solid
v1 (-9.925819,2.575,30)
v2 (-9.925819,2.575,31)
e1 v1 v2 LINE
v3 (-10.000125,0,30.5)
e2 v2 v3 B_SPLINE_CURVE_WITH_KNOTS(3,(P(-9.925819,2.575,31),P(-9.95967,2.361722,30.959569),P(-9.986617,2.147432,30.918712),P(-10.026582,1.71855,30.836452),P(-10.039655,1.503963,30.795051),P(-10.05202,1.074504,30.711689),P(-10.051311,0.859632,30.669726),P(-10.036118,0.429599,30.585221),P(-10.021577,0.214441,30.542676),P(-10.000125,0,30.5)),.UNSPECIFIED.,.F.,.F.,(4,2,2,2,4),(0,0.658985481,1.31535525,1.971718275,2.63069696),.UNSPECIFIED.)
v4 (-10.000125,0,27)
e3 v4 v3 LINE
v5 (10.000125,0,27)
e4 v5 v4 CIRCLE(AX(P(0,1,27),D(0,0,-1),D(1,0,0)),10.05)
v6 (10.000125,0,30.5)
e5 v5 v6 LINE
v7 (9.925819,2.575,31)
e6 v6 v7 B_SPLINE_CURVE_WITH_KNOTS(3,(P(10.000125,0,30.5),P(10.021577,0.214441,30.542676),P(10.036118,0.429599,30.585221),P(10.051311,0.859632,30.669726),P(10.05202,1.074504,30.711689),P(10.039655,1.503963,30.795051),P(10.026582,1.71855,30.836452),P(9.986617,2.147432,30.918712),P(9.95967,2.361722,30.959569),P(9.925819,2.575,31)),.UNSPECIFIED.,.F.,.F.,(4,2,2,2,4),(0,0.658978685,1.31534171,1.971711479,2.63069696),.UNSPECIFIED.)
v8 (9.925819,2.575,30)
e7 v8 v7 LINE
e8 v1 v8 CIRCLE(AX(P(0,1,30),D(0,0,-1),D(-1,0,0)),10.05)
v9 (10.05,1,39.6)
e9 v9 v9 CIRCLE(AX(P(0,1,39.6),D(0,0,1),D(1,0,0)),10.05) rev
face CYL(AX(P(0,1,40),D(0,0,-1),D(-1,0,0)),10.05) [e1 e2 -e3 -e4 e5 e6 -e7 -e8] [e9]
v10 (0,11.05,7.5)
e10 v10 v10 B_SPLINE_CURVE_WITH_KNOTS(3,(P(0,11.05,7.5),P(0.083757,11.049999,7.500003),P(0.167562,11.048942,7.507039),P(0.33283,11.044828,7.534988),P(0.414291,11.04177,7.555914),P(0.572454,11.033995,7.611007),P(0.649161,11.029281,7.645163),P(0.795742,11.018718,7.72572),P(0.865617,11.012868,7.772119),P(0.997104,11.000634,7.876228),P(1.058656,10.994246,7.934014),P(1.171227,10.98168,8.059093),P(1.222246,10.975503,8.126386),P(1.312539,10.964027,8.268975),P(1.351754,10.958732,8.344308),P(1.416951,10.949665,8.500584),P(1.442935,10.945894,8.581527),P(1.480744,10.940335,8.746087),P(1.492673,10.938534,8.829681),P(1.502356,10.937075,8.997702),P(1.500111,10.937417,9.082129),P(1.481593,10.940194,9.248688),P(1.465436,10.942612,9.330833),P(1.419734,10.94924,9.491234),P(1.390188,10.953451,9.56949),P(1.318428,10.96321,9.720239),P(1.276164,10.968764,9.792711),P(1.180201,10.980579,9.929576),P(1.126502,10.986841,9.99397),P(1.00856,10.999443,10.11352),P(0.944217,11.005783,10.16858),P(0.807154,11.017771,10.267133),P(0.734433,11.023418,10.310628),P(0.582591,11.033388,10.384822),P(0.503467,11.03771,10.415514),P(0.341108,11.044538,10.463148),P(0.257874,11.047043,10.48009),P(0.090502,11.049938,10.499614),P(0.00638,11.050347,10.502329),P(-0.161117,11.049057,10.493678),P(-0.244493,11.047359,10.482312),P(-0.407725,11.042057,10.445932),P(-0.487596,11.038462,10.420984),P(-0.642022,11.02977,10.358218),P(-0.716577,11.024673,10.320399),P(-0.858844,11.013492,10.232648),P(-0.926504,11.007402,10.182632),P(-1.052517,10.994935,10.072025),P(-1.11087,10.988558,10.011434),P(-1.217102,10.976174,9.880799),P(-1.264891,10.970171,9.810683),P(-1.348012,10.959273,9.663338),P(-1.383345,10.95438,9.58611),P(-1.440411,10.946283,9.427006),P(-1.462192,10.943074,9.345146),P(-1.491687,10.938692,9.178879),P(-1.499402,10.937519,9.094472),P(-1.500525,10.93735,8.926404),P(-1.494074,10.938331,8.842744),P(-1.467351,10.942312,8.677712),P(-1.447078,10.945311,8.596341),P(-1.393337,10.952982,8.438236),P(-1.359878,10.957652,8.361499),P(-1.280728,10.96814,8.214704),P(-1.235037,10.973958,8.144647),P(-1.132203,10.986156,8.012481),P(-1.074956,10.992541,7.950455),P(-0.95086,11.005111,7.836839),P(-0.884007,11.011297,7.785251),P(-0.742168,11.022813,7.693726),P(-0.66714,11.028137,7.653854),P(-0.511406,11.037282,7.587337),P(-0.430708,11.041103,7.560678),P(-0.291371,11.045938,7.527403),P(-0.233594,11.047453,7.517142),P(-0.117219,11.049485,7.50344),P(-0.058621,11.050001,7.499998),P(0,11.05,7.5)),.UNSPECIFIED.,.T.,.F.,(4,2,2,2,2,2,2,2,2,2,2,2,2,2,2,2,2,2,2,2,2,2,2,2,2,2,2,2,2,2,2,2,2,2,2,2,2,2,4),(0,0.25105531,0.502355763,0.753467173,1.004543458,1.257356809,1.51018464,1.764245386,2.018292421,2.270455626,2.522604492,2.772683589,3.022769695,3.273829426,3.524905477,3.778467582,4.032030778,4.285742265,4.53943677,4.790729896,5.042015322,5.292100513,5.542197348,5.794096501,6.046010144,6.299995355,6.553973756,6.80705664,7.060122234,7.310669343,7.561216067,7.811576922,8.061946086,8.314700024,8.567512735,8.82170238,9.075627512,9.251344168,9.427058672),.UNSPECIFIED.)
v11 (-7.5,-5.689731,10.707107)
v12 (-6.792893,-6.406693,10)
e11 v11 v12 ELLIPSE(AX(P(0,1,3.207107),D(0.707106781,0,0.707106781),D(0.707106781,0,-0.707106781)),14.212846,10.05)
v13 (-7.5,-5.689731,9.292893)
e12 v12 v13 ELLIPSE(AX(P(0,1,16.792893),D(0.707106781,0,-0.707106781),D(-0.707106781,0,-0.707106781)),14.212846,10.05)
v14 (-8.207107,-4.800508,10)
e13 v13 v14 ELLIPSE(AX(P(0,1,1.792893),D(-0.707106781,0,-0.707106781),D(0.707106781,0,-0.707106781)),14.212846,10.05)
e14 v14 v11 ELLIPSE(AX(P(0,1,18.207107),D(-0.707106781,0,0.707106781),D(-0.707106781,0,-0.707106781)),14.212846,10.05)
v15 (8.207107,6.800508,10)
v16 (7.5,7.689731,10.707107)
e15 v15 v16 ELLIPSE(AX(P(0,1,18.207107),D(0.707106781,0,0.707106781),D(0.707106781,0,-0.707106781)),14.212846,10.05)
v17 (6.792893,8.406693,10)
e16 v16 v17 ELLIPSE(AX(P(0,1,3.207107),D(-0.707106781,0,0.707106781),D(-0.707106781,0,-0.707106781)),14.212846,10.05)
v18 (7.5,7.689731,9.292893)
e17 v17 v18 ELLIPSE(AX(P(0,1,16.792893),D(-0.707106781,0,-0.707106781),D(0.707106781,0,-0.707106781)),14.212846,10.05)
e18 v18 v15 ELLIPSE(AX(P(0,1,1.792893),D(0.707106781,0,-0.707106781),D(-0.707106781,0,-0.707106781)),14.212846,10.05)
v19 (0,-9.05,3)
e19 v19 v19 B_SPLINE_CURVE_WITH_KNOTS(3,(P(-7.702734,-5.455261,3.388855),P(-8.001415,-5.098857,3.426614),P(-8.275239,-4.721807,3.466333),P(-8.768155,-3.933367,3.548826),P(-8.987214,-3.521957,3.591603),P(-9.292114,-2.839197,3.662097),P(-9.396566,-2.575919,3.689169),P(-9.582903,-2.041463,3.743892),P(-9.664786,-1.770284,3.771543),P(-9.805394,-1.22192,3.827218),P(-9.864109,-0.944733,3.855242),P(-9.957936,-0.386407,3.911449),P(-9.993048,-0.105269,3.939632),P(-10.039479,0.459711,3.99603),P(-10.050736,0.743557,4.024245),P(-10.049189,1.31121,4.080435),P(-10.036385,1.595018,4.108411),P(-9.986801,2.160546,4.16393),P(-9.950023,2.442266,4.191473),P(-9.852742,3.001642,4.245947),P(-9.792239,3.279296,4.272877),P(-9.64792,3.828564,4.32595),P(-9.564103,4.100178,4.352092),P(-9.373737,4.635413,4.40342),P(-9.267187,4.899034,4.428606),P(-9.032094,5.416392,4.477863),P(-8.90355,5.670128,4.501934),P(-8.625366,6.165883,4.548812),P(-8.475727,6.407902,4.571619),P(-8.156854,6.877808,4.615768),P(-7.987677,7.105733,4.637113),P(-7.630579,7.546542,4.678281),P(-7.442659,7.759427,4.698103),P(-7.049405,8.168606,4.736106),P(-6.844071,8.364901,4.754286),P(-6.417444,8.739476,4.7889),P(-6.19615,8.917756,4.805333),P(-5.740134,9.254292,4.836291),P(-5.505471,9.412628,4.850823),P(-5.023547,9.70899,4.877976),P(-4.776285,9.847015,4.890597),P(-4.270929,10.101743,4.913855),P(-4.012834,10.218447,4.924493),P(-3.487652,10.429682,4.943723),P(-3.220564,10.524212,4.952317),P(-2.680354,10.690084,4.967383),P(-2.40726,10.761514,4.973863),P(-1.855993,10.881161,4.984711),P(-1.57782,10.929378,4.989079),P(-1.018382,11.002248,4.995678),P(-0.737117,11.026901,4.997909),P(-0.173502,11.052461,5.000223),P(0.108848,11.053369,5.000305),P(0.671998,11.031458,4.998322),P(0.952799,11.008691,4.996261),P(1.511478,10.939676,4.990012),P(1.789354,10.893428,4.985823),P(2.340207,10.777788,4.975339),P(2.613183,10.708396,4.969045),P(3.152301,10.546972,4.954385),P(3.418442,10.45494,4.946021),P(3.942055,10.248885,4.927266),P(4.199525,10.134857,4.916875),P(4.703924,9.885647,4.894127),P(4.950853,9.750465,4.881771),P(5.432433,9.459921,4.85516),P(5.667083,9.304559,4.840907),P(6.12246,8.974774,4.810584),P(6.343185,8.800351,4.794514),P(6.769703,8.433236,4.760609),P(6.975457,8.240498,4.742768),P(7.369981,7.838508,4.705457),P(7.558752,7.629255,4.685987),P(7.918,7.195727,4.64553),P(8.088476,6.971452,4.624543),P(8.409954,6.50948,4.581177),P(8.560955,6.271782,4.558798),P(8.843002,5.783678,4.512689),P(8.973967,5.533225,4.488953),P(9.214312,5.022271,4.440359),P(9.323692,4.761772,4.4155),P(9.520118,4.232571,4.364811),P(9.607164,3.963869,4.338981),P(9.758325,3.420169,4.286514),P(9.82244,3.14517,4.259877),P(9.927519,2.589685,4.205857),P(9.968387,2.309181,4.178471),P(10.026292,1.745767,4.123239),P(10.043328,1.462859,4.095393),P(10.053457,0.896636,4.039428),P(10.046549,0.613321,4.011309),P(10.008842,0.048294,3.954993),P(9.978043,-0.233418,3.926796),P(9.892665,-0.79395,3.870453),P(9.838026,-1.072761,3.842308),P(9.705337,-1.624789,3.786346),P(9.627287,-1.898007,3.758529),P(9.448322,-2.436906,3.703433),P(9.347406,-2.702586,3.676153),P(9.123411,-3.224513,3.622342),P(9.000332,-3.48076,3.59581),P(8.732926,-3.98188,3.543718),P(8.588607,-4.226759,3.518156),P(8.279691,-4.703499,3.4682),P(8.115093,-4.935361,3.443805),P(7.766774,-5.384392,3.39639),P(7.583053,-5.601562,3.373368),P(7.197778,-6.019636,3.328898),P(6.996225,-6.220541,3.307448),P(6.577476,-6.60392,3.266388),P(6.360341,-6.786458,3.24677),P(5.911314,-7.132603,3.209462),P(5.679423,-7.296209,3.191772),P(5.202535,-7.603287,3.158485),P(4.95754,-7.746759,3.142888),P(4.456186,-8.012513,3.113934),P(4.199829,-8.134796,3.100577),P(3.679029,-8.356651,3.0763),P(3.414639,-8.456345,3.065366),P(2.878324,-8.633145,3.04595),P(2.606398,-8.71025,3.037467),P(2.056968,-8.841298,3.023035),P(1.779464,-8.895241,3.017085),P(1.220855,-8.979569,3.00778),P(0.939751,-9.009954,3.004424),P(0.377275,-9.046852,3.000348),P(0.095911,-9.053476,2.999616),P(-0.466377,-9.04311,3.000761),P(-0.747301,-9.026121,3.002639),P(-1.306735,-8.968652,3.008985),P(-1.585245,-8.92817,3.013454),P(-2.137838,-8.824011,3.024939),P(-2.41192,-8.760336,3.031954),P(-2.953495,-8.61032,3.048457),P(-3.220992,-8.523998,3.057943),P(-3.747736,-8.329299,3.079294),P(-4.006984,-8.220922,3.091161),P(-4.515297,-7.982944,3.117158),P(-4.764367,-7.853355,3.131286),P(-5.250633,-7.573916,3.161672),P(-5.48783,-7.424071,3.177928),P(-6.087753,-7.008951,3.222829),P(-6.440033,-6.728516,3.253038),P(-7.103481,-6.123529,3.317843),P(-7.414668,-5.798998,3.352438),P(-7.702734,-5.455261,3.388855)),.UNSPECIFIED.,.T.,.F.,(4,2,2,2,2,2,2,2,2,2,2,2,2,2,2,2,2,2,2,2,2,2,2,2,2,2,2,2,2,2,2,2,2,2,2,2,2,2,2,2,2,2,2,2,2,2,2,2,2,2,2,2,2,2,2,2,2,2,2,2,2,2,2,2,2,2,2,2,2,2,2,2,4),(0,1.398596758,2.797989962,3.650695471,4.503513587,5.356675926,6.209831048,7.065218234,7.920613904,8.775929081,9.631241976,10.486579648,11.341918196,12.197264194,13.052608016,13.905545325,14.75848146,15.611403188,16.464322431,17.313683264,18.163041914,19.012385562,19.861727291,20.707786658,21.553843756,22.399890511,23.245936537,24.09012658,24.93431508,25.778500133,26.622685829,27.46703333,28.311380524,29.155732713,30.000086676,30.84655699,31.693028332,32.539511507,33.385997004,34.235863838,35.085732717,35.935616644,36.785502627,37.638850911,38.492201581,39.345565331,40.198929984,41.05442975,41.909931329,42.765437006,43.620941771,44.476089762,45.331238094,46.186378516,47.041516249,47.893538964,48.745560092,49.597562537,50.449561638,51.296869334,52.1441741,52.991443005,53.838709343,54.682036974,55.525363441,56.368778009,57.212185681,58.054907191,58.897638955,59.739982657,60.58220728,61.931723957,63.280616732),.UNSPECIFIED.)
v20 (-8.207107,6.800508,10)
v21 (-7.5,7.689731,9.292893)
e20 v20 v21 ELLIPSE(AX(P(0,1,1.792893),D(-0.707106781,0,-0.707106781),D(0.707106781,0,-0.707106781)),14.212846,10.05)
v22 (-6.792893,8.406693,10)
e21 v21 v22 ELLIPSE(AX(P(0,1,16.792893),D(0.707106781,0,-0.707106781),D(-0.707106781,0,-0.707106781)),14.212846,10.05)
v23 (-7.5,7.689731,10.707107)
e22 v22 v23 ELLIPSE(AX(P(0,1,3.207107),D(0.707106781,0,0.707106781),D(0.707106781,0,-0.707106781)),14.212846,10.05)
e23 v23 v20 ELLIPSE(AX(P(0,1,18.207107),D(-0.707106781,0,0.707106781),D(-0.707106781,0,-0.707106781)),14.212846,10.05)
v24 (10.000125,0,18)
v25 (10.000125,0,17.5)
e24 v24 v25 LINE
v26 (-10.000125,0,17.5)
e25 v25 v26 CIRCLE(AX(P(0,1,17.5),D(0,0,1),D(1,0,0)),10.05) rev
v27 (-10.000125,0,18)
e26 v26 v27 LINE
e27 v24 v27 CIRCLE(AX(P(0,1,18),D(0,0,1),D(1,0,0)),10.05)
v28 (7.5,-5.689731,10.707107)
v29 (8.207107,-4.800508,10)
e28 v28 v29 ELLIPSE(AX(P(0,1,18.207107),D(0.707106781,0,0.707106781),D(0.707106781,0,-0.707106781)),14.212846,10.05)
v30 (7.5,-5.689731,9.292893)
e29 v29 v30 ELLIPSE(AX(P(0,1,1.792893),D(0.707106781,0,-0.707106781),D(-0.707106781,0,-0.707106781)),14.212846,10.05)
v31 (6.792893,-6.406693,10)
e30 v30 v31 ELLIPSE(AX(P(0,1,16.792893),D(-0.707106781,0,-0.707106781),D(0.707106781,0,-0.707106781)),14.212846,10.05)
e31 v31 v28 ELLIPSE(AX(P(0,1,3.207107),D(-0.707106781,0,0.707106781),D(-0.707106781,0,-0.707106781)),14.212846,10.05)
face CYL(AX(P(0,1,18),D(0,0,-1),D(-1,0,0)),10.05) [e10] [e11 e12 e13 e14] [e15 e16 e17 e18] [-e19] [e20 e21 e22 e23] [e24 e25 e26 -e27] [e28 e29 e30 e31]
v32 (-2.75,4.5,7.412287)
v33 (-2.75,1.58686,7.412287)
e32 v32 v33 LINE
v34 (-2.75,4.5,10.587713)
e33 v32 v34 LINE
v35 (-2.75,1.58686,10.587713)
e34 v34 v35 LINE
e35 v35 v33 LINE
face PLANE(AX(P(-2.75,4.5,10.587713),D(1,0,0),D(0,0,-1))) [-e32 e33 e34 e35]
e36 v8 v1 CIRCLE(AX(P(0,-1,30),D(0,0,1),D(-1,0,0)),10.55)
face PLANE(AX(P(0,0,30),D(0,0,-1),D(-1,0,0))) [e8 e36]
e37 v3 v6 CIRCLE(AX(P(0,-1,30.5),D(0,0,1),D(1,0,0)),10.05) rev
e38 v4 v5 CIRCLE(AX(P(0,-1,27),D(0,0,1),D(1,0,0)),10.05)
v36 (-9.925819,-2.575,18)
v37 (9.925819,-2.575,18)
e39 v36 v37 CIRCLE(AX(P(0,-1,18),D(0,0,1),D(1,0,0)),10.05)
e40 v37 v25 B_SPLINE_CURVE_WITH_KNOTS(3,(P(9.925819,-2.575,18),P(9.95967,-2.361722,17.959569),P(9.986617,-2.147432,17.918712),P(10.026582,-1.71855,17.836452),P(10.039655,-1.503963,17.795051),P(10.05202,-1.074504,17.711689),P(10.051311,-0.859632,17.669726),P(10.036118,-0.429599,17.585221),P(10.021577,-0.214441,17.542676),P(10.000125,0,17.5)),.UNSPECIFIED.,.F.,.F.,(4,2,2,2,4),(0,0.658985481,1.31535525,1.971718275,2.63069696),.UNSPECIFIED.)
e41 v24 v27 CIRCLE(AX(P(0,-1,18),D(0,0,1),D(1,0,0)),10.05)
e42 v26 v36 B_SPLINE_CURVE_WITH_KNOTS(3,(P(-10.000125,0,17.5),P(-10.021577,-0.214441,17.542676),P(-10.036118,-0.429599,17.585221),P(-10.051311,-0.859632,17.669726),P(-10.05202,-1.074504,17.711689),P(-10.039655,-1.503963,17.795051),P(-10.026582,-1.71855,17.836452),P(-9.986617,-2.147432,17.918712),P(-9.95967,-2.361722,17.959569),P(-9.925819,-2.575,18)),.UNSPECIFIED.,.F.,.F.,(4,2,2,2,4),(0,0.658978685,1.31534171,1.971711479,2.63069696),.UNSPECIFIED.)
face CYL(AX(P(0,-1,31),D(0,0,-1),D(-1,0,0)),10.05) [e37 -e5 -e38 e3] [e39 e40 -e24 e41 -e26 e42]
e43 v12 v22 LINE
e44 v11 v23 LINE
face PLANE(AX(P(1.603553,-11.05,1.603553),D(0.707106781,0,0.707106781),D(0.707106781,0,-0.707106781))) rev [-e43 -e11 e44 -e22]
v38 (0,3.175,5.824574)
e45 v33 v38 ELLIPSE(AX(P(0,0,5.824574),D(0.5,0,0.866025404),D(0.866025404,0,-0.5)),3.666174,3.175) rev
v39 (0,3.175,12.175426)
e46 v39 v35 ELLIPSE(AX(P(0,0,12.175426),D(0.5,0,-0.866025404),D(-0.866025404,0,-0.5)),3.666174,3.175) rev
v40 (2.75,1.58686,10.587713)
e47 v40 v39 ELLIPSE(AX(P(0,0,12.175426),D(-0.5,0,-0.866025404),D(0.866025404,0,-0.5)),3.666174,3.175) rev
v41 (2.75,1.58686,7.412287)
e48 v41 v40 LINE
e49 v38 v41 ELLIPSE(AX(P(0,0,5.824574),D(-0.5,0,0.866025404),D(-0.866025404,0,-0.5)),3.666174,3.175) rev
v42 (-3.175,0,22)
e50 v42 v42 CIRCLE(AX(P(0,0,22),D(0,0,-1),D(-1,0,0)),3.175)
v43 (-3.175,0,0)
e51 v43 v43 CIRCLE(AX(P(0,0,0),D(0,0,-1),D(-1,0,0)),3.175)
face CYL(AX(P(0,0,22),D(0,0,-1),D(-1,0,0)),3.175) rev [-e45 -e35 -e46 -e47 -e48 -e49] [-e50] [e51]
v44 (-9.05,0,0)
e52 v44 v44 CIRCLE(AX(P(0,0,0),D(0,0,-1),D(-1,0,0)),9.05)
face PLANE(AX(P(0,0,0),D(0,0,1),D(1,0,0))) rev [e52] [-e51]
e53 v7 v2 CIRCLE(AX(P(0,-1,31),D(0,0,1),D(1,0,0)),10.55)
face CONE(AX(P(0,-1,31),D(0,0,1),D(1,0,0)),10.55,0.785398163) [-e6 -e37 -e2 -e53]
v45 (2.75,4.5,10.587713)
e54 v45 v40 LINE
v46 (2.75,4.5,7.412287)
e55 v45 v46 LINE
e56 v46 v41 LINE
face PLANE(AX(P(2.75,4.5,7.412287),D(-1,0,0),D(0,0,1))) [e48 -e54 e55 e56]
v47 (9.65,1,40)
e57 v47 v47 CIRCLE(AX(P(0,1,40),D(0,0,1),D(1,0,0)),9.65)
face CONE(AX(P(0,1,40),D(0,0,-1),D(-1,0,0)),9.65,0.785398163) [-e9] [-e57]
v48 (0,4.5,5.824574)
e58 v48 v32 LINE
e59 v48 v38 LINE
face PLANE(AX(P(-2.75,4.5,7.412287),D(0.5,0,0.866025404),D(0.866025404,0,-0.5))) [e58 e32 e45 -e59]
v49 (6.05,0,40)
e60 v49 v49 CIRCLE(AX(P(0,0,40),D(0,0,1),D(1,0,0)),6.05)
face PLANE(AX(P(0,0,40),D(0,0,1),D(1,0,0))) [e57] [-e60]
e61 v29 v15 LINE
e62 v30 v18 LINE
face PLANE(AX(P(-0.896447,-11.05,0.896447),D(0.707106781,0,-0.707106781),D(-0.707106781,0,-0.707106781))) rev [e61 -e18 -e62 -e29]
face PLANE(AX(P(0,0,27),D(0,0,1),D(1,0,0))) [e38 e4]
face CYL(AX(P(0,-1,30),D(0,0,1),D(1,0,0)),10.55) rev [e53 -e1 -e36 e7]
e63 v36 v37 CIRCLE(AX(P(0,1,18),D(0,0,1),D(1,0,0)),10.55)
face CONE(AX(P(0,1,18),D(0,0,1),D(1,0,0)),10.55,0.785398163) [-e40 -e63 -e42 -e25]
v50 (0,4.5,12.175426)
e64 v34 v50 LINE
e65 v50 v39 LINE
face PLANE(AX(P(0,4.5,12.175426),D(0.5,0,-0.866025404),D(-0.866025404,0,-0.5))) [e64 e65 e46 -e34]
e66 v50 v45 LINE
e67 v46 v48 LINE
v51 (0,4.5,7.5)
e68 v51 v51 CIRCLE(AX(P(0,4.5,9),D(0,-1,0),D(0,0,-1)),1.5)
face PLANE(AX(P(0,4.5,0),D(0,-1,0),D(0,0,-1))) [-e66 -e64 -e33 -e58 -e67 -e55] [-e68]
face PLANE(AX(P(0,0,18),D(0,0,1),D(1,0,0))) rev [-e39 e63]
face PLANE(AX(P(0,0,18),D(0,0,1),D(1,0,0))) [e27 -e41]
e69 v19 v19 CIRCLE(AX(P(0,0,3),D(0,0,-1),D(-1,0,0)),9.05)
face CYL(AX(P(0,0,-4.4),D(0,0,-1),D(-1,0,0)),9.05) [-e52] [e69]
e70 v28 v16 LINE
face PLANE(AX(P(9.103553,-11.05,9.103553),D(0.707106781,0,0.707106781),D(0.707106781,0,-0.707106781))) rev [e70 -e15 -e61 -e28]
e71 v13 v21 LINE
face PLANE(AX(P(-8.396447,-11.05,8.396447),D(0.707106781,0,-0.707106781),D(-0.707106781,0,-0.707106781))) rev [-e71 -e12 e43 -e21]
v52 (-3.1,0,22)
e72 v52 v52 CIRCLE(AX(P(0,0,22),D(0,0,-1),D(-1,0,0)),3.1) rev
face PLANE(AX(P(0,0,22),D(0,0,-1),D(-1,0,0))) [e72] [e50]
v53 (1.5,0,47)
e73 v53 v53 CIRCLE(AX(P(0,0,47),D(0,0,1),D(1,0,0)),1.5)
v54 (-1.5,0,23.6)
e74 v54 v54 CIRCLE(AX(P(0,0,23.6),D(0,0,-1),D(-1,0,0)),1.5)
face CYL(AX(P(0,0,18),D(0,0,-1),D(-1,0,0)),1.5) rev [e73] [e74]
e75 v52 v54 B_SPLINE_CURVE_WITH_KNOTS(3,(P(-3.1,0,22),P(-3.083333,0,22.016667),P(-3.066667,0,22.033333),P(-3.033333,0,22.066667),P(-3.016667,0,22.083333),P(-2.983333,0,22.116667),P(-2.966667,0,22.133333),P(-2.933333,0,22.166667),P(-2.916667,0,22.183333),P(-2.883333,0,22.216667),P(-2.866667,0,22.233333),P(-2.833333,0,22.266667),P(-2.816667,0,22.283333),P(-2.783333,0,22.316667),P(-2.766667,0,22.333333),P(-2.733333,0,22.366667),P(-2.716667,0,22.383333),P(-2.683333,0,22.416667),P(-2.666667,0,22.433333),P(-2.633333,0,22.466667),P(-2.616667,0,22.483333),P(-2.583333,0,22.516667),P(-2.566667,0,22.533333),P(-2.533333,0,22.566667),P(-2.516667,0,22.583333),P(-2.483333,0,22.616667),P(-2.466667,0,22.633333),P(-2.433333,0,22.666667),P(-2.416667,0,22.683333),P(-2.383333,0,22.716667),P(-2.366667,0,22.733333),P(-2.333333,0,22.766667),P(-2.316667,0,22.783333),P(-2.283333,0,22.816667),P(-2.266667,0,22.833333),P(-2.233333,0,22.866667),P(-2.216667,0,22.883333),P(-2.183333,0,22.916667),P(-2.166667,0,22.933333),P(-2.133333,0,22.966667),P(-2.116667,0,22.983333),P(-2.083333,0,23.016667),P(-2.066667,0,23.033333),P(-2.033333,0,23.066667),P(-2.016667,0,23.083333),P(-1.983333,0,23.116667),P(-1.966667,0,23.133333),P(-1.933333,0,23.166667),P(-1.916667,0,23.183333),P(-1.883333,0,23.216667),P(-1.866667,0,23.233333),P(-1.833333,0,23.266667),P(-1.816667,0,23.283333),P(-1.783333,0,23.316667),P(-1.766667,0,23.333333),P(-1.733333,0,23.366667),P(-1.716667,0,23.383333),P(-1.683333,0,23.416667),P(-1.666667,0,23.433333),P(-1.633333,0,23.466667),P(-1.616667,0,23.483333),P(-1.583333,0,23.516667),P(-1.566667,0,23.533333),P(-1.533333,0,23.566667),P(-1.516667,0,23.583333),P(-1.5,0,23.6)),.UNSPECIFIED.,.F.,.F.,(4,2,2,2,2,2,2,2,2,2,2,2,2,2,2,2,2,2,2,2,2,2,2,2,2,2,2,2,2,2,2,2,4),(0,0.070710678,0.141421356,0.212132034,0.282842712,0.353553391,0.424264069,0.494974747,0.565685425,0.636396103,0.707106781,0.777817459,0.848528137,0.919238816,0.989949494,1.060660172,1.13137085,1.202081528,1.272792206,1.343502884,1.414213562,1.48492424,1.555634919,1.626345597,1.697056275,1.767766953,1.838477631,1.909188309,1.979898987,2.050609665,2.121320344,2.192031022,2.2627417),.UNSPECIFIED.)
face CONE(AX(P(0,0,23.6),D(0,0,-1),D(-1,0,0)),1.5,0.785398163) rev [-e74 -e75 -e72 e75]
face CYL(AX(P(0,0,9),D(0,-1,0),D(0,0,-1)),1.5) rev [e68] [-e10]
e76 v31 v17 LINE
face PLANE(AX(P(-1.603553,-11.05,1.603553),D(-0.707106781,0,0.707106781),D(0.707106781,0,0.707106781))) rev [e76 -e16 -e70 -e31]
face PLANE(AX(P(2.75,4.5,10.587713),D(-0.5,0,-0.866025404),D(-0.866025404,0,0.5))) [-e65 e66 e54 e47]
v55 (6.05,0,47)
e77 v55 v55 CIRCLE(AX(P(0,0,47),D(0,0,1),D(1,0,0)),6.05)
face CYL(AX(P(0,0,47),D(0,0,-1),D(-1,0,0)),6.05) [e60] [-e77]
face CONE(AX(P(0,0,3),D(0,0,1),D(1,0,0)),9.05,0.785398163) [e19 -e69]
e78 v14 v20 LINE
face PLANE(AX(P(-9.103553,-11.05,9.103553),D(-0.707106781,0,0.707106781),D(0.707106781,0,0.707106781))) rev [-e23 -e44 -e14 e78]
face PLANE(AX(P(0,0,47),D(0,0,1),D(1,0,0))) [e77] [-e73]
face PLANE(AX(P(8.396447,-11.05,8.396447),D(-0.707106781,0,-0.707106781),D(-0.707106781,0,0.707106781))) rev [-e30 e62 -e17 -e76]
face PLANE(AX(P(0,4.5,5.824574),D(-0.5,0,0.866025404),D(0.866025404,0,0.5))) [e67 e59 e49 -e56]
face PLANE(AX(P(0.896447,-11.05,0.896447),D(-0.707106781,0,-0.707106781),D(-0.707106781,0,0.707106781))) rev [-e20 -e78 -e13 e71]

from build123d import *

# Parameters (mm, degrees)
SKETCH1_R             = 10.05
SKETCH1_R_2           = 1.5
EXTRUSION1_DEPTH      = 18
SKETCH2_R             = 10.05
SKETCH2_R_2           = 1.5
EXTRUSION2_DEPTH      = 13
SKETCH3_R             = 10.05
SKETCH3_R_2           = 1.5
EXTRUSION3_DEPTH      = 9
EXTRUSION4_START      = -4
EXTRUSION4_DEPTH      = 4
SKETCH5_R             = 6.05
SKETCH5_R_2           = 1.5
EXTRUSION5_DEPTH      = 7
SKETCH6_R             = 3.175
SKETCH6_R_2           = 1.5
EXTRUSION6_DEPTH      = 22
EXTRUSION7_DEPTH      = 4.5
SKETCH8_W             = 1.5
SKETCH8_H             = 11.05
EXTRUSION8_DEPTH      = 50.316376633
EXTRUSION8_DEPTH_BACK = 50.316376633
CHAMFER1_SIZE         = 0.4
SKETCH12_W            = 4
SKETCH12_H            = 3
CHAMFER2_SIZE         = 1.6
CHAMFER3_SIZE         = 0.5
CHAMFER4_SIZE         = 0.5
EXTRUSION10_START     = 1
EXTRUSION10_DEPTH     = 1


with BuildPart() as part:
    # Sketch1 → Extrusion1 (new body)
    with BuildSketch(Plane.XY):
        with Locations((0, 1)):
            Circle(SKETCH1_R)
        Circle(SKETCH1_R_2, mode=Mode.SUBTRACT)
    extrude(amount=EXTRUSION1_DEPTH)

    # Sketch2 → Extrusion2 (add)
    with BuildSketch(Plane(origin=(0, 1, 18), x_dir=(1, 0, 0), z_dir=(0, 0, 1))):
        with Locations(Location((0, -2, 0), (0, 0, 174.289477772))):
            Circle(SKETCH2_R)
        with Locations((0, -1)):
            Circle(SKETCH2_R_2, mode=Mode.SUBTRACT)
    extrude(amount=EXTRUSION2_DEPTH)

    # Sketch3 → Extrusion3 (add)
    with BuildSketch(Plane(origin=(0, -1, 31), x_dir=(1, 0, 0), z_dir=(0, 0, 1))):
        with Locations(Location((0, 2, 0), (0, 0, 185.710522228))):
            Circle(SKETCH3_R)
        with Locations((0, 1)):
            Circle(SKETCH3_R_2, mode=Mode.SUBTRACT)
    extrude(amount=EXTRUSION3_DEPTH)

    # Sketch4 → Extrusion4 (cut)
    with BuildSketch(Plane(origin=(0, 1, 31), x_dir=(1, 0, 0), z_dir=(0, 0, 1)).offset(EXTRUSION4_START)):
        with BuildLine():
            ThreePointArc((-10.000124999, -1), (0, -12.05), (10.000124999, -1))
            ThreePointArc((10.000124999, -1), (0, -10.05), (-10.000124999, -1))
        make_face()
    extrude(amount=EXTRUSION4_DEPTH, mode=Mode.SUBTRACT)

    # Sketch5 → Extrusion5 (add)
    with BuildSketch(Plane(origin=(0, 1, 40), x_dir=(1, 0, 0), z_dir=(0, 0, 1))):
        with Locations((0, -1)):
            Circle(SKETCH5_R)
        with Locations((0, -1)):
            Circle(SKETCH5_R_2, mode=Mode.SUBTRACT)
    extrude(amount=EXTRUSION5_DEPTH)

    # Sketch6 → Extrusion6 (cut)
    with BuildSketch(Plane(origin=(0, 1, 0), x_dir=(-1, 0, 0), z_dir=(0, 0, -1))):
        with Locations((0, -1)):
            Circle(SKETCH6_R)
        with Locations((0, -1)):
            Circle(SKETCH6_R_2, mode=Mode.SUBTRACT)
    extrude(amount=-EXTRUSION6_DEPTH, mode=Mode.SUBTRACT)

    # Sketch7 → Extrusion7 (cut)
    with BuildSketch(Plane(origin=(0, 0, 0), x_dir=(-1, 0, 0), z_dir=(0, 1, 0))):
        Polygon((-2.75, 7.41228676), (-2.75, 10.58771324), (0, 12.175426481), (2.75, 10.58771324), (2.75, 7.41228676), (0, 5.824573519), align=None)
    extrude(amount=EXTRUSION7_DEPTH, mode=Mode.SUBTRACT)

    # Sketch8 → Hole2 (revolve, cut)
    with BuildSketch(Plane(origin=(0, 0, 9), x_dir=(0, 0, -1), z_dir=(1, 0, 0))):
        with Locations((0.75, 5.525)):
            Rectangle(SKETCH8_W, SKETCH8_H)
    revolve(axis=Axis((0, 110, 9), (0, -1, 0)), mode=Mode.SUBTRACT)

    # Sketch10 → Extrusion8 (cut, two sides: drawn at the far end of the back side and taken through both)
    with BuildSketch(Plane(origin=(0, 0, 0), x_dir=(-1, 0, 0), z_dir=(0, 1, 0)).offset(-EXTRUSION8_DEPTH_BACK)):
        Polygon((-7.5, 10.707106781), (-8.207106781, 10), (-7.5, 9.292893219), (-6.792893219, 10), align=None)
        Polygon((7.5, 10.707106781), (6.792893219, 10), (7.5, 9.292893219), (8.207106781, 10), align=None)
    extrude(amount=EXTRUSION8_DEPTH + EXTRUSION8_DEPTH_BACK, mode=Mode.SUBTRACT)

    # Chamfer1
    chamfer1_edges = [part.edges().sort_by_distance(p)[0] for p in [
        (10.000124999, 2, 40),
    ]]
    chamfer(chamfer1_edges, length=CHAMFER1_SIZE)

    # Sketch12 → Revolution1 (revolve, cut)
    with BuildSketch(Plane.YZ, mode=Mode.PRIVATE) as revolution1_sk:
        with Locations((-11.05, 1.5)):
            Rectangle(SKETCH12_W, SKETCH12_H)
        Polygon((-9.05, 3), (-13.05, 7), (-13.05, 3), align=None)
    revolve(revolution1_sk.sketch.rotate(Axis((0, 0, -4.4), (0, 0, 1)), 270), axis=Axis((0, 0, -4.4), (0, 0, 1)), mode=Mode.SUBTRACT)

    # Chamfer2
    chamfer2_edges = [part.edges().sort_by_distance(p)[0] for p in [
        (-1.5, 0, 22),
    ]]
    chamfer(chamfer2_edges, length=CHAMFER2_SIZE)

    # Chamfer3
    # the kernel refuses this chamfer: 0.5 mm, written as the material it adds along each edge
    with BuildSketch(Plane(origin=(0, -1, 31), x_dir=(0.9995951137043791, -0.028453622938550055, 0), z_dir=(-0.028453622938550055, -0.9995951137043791, 0))) as chamfer3_piece_1_section:
        Polygon((10.05, -CHAMFER3_SIZE), (10.05 + CHAMFER3_SIZE, 0), (10.05, 0), align=None)
    chamfer3_piece_1 = revolve(axis=Axis((0, -1, 31), (0, 0, 1)), revolution_arc=183.260985134, mode=Mode.PRIVATE)
    chamfer3_piece_1 = chamfer3_piece_1 & Plane(origin=(0, 1, 30.761134514), x_dir=(-0.9950373133554516, -0.09950248755867733, 0), z_dir=(0, 0, -1)) * Cylinder(10.05, 43, mode=Mode.PRIVATE)
    add(chamfer3_piece_1)

    # Chamfer4
    # the kernel refuses this chamfer: 0.5 mm, written as the material it adds along each edge
    with BuildSketch(Plane(origin=(0, 1, 18), x_dir=(-0.9995951137044771, 0.028453622935110102, 0), z_dir=(0.028453622935110102, 0.9995951137044771, 0))) as chamfer4_piece_1_section:
        Polygon((10.05 + CHAMFER4_SIZE, 0), (10.05, -CHAMFER4_SIZE), (10.05, 0), align=None)
    chamfer4_piece_1 = revolve(axis=Axis((0, 1, 18), (0, 0, 1)), revolution_arc=183.260985134, mode=Mode.PRIVATE)
    chamfer4_piece_1 = chamfer4_piece_1 & Plane(origin=(0, -1, 17.760783503), x_dir=(-0.9950373133554516, 0.09950248755867756, 0), z_dir=(0, 0, -1)) * Cylinder(10.05, 43, mode=Mode.PRIVATE)
    add(chamfer4_piece_1)

    # Sketch13 → Extrusion10 (add)
    with BuildSketch(Plane(origin=(0, -1, 31), x_dir=(-1, 0, 0), z_dir=(0, 0, -1)).offset(EXTRUSION10_START)):
        with BuildLine():
            ThreePointArc((9.925818606, 3.575), (0, 12.05), (-9.925818606, 3.575))
            ThreePointArc((-9.925818606, 3.575), (0, 10.55), (9.925818606, 3.575))
        make_face()
    extrude(amount=-EXTRUSION10_DEPTH)


solid = part.part
